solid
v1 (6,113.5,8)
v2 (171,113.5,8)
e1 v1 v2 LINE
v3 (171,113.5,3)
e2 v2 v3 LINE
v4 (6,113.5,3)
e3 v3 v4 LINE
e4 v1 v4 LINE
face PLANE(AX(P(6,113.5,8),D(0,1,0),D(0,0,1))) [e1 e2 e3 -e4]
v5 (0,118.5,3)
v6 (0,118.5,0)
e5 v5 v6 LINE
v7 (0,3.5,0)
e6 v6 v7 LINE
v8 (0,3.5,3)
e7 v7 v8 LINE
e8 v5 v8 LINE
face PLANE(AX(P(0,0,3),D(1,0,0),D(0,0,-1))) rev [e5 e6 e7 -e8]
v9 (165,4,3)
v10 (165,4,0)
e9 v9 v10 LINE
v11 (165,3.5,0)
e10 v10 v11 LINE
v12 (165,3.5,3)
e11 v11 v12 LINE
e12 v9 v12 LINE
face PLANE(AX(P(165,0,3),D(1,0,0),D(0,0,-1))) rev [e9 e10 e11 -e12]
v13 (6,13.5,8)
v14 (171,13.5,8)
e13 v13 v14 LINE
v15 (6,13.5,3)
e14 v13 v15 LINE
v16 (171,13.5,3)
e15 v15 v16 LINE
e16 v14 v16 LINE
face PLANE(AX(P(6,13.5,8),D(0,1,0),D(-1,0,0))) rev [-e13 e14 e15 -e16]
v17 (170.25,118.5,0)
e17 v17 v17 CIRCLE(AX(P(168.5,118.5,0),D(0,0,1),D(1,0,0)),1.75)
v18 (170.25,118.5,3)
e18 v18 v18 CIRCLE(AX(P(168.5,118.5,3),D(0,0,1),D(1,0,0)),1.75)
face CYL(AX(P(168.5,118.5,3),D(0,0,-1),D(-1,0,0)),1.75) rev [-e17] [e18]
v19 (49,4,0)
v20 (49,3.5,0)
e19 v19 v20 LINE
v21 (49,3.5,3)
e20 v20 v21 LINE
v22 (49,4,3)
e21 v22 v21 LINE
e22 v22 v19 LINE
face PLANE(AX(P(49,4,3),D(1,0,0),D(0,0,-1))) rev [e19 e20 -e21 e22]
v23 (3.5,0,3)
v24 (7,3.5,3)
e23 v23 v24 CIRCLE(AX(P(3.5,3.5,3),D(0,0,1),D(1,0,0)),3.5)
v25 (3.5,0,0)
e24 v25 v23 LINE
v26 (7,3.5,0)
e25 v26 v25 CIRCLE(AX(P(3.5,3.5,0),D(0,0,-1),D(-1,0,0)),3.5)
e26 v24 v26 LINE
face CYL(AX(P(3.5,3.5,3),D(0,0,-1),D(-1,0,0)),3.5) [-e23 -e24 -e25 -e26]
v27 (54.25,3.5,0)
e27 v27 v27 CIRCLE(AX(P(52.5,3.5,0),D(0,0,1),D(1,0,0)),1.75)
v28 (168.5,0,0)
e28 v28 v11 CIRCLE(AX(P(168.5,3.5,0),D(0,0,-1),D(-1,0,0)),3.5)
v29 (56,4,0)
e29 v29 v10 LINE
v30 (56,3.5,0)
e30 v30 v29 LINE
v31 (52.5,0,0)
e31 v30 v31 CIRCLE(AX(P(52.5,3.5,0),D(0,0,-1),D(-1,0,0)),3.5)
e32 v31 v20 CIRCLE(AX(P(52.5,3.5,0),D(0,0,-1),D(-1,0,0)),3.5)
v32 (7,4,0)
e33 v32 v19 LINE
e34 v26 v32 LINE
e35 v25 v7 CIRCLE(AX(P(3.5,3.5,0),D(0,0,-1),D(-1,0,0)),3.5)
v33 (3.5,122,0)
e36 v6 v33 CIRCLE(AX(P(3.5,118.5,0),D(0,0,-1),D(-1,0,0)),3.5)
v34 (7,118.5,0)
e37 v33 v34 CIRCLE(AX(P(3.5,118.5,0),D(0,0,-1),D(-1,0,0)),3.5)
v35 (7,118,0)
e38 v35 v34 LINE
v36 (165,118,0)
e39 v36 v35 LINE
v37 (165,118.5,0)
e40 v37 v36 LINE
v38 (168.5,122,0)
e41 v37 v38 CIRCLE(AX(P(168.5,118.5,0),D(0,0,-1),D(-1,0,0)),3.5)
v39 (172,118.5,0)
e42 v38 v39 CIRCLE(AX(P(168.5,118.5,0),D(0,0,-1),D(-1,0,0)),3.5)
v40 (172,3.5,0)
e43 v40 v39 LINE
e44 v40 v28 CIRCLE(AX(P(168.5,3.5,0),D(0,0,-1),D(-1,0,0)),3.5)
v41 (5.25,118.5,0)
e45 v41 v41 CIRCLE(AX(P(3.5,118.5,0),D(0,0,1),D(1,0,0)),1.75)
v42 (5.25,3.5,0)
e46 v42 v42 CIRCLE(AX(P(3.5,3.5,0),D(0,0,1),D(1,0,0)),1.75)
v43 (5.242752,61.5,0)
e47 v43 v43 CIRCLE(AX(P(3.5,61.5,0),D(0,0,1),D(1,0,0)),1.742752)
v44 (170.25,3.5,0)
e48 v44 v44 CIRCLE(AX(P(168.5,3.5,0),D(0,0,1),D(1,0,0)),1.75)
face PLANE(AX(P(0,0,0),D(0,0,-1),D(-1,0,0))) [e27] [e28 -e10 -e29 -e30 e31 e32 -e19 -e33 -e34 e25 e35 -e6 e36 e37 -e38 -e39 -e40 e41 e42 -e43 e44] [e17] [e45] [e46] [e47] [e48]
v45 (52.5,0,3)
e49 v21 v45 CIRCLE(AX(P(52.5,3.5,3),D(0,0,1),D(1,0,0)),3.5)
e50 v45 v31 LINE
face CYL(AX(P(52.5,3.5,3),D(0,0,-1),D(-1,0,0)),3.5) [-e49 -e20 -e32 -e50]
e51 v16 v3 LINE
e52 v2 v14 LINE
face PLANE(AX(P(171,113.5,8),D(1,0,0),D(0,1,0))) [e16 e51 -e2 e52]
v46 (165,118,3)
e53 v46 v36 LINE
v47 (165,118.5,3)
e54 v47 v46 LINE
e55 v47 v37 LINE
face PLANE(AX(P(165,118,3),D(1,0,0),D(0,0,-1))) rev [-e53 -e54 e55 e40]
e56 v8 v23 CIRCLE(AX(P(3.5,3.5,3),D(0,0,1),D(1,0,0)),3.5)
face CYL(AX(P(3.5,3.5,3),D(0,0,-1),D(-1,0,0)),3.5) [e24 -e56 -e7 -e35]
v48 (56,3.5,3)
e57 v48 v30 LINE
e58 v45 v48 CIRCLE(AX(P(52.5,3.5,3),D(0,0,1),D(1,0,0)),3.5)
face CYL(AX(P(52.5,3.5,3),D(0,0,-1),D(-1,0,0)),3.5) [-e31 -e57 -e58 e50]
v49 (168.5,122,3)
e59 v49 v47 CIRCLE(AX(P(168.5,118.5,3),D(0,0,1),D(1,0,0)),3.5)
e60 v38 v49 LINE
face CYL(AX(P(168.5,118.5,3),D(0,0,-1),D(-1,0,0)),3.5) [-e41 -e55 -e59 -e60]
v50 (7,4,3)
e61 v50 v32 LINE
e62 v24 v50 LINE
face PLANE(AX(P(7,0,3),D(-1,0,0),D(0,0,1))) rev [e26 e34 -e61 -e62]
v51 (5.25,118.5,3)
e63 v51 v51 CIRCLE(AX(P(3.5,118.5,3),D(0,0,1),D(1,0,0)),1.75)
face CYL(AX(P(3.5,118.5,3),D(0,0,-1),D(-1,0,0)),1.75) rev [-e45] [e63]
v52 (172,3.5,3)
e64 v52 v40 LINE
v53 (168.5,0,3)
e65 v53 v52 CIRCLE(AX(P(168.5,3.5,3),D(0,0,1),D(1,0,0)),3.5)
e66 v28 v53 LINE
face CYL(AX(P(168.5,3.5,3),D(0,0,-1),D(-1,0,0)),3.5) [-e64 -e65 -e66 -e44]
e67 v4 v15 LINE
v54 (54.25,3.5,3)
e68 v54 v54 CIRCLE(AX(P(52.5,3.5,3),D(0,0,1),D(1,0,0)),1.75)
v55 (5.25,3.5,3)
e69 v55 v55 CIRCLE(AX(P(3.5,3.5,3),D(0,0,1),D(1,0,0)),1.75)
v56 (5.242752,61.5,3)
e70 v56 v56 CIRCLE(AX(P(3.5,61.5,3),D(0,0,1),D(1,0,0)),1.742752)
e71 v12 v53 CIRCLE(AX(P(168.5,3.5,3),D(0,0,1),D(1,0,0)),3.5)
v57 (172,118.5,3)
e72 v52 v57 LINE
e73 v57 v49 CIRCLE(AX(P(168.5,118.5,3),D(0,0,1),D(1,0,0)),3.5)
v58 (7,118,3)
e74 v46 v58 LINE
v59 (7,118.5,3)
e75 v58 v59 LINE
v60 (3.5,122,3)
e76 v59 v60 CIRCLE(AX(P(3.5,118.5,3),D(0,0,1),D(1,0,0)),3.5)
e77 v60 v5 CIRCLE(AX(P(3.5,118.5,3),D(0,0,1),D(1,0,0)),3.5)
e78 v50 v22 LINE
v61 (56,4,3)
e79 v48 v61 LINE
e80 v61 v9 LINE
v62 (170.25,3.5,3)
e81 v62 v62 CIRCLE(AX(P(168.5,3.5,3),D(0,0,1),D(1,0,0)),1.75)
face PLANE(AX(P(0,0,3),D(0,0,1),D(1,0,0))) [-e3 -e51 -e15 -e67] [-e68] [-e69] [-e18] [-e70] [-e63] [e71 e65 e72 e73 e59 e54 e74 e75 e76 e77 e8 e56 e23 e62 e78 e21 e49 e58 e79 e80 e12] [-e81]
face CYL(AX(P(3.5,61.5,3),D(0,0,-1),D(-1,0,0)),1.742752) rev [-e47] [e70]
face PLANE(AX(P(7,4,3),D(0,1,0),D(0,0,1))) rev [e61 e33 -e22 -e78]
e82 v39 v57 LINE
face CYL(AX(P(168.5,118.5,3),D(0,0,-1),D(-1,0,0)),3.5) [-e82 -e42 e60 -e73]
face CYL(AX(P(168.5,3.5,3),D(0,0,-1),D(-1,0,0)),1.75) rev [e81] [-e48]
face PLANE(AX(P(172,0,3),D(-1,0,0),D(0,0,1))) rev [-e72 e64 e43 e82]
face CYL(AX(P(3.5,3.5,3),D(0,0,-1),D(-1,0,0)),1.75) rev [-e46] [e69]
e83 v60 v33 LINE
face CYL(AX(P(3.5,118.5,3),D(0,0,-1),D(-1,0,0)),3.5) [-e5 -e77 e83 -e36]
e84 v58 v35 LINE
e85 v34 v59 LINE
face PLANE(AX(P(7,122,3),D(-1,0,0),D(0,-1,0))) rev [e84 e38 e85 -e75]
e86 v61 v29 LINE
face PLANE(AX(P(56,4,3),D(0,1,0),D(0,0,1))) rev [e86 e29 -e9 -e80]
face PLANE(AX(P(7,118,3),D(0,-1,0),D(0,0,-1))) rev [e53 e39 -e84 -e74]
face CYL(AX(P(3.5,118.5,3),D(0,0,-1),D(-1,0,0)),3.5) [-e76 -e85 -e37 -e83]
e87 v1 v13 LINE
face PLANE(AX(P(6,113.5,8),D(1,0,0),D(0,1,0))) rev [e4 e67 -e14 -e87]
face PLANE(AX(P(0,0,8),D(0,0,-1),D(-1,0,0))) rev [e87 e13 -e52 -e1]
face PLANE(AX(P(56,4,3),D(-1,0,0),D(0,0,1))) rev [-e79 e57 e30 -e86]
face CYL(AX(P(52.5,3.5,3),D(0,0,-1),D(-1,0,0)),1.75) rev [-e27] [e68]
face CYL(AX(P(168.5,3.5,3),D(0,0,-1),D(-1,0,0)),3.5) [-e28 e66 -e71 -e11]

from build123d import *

# Parameters (mm, degrees)
SKETCH1_W           = 165
SKETCH1_H           = 100
BOSS_EXTRUDE1_DEPTH = 8
SKETCH1_4_R         = 1.75
SKETCH1_4_R_2       = 1.742752204
SKETCH1_4_W         = 165
SKETCH1_4_H         = 100
BOSS_EXTRUDE2_DEPTH = 3
FILLET3_R           = 3.5


with BuildPart() as part:
    # Sketch1 → Boss-Extrude1 (new body)
    with BuildSketch(Plane.XY):
        with Locations((88.5, 63.5)):
            Rectangle(SKETCH1_W, SKETCH1_H)
    extrude(amount=BOSS_EXTRUDE1_DEPTH)

    # Sketch1<4> → Boss-Extrude2 (add)
    with BuildSketch(Plane.XY):
        Polygon((7, 122), (7, 118), (165, 118), (165, 122), (172, 122), (172, 0), (165, 0), (165, 4), (56, 4), (56, 0), (49, 0), (49, 4), (7, 4), (7, 0), (0, 0), (0, 122), align=None)
        with Locations((3.5, 118.5)):
            Circle(SKETCH1_4_R, mode=Mode.SUBTRACT)
        with Locations((168.5, 118.5)):
            Circle(SKETCH1_4_R, mode=Mode.SUBTRACT)
        with Locations((168.5, 3.5)):
            Circle(SKETCH1_4_R, mode=Mode.SUBTRACT)
        with Locations((3.5, 3.5)):
            Circle(SKETCH1_4_R, mode=Mode.SUBTRACT)
        with Locations((52.5, 3.5)):
            Circle(SKETCH1_4_R, mode=Mode.SUBTRACT)
        with Locations((3.5, 61.5)):
            Circle(SKETCH1_4_R_2, mode=Mode.SUBTRACT)
        with Locations((88.5, 63.5)):
            Rectangle(SKETCH1_4_W, SKETCH1_4_H, mode=Mode.SUBTRACT)
    extrude(amount=BOSS_EXTRUDE2_DEPTH)

    # Fillet3
    fillet3_edges = [part.edges().sort_by_distance(p)[0] for p in [
        (56, 0, 1.5),
        (165, 0, 1.5),
        (172, 0, 1.5),
        (49, 0, 1.5),
        (0, 0, 1.5),
        (7, 0, 1.5),
        (0, 122, 1.5),
        (7, 122, 1.5),
        (172, 122, 1.5),
        (165, 122, 1.5),
    ]]
    fillet(fillet3_edges, radius=FILLET3_R - 0.0001)  # a hair under: the kernel refuses the full size


solid = part.part
